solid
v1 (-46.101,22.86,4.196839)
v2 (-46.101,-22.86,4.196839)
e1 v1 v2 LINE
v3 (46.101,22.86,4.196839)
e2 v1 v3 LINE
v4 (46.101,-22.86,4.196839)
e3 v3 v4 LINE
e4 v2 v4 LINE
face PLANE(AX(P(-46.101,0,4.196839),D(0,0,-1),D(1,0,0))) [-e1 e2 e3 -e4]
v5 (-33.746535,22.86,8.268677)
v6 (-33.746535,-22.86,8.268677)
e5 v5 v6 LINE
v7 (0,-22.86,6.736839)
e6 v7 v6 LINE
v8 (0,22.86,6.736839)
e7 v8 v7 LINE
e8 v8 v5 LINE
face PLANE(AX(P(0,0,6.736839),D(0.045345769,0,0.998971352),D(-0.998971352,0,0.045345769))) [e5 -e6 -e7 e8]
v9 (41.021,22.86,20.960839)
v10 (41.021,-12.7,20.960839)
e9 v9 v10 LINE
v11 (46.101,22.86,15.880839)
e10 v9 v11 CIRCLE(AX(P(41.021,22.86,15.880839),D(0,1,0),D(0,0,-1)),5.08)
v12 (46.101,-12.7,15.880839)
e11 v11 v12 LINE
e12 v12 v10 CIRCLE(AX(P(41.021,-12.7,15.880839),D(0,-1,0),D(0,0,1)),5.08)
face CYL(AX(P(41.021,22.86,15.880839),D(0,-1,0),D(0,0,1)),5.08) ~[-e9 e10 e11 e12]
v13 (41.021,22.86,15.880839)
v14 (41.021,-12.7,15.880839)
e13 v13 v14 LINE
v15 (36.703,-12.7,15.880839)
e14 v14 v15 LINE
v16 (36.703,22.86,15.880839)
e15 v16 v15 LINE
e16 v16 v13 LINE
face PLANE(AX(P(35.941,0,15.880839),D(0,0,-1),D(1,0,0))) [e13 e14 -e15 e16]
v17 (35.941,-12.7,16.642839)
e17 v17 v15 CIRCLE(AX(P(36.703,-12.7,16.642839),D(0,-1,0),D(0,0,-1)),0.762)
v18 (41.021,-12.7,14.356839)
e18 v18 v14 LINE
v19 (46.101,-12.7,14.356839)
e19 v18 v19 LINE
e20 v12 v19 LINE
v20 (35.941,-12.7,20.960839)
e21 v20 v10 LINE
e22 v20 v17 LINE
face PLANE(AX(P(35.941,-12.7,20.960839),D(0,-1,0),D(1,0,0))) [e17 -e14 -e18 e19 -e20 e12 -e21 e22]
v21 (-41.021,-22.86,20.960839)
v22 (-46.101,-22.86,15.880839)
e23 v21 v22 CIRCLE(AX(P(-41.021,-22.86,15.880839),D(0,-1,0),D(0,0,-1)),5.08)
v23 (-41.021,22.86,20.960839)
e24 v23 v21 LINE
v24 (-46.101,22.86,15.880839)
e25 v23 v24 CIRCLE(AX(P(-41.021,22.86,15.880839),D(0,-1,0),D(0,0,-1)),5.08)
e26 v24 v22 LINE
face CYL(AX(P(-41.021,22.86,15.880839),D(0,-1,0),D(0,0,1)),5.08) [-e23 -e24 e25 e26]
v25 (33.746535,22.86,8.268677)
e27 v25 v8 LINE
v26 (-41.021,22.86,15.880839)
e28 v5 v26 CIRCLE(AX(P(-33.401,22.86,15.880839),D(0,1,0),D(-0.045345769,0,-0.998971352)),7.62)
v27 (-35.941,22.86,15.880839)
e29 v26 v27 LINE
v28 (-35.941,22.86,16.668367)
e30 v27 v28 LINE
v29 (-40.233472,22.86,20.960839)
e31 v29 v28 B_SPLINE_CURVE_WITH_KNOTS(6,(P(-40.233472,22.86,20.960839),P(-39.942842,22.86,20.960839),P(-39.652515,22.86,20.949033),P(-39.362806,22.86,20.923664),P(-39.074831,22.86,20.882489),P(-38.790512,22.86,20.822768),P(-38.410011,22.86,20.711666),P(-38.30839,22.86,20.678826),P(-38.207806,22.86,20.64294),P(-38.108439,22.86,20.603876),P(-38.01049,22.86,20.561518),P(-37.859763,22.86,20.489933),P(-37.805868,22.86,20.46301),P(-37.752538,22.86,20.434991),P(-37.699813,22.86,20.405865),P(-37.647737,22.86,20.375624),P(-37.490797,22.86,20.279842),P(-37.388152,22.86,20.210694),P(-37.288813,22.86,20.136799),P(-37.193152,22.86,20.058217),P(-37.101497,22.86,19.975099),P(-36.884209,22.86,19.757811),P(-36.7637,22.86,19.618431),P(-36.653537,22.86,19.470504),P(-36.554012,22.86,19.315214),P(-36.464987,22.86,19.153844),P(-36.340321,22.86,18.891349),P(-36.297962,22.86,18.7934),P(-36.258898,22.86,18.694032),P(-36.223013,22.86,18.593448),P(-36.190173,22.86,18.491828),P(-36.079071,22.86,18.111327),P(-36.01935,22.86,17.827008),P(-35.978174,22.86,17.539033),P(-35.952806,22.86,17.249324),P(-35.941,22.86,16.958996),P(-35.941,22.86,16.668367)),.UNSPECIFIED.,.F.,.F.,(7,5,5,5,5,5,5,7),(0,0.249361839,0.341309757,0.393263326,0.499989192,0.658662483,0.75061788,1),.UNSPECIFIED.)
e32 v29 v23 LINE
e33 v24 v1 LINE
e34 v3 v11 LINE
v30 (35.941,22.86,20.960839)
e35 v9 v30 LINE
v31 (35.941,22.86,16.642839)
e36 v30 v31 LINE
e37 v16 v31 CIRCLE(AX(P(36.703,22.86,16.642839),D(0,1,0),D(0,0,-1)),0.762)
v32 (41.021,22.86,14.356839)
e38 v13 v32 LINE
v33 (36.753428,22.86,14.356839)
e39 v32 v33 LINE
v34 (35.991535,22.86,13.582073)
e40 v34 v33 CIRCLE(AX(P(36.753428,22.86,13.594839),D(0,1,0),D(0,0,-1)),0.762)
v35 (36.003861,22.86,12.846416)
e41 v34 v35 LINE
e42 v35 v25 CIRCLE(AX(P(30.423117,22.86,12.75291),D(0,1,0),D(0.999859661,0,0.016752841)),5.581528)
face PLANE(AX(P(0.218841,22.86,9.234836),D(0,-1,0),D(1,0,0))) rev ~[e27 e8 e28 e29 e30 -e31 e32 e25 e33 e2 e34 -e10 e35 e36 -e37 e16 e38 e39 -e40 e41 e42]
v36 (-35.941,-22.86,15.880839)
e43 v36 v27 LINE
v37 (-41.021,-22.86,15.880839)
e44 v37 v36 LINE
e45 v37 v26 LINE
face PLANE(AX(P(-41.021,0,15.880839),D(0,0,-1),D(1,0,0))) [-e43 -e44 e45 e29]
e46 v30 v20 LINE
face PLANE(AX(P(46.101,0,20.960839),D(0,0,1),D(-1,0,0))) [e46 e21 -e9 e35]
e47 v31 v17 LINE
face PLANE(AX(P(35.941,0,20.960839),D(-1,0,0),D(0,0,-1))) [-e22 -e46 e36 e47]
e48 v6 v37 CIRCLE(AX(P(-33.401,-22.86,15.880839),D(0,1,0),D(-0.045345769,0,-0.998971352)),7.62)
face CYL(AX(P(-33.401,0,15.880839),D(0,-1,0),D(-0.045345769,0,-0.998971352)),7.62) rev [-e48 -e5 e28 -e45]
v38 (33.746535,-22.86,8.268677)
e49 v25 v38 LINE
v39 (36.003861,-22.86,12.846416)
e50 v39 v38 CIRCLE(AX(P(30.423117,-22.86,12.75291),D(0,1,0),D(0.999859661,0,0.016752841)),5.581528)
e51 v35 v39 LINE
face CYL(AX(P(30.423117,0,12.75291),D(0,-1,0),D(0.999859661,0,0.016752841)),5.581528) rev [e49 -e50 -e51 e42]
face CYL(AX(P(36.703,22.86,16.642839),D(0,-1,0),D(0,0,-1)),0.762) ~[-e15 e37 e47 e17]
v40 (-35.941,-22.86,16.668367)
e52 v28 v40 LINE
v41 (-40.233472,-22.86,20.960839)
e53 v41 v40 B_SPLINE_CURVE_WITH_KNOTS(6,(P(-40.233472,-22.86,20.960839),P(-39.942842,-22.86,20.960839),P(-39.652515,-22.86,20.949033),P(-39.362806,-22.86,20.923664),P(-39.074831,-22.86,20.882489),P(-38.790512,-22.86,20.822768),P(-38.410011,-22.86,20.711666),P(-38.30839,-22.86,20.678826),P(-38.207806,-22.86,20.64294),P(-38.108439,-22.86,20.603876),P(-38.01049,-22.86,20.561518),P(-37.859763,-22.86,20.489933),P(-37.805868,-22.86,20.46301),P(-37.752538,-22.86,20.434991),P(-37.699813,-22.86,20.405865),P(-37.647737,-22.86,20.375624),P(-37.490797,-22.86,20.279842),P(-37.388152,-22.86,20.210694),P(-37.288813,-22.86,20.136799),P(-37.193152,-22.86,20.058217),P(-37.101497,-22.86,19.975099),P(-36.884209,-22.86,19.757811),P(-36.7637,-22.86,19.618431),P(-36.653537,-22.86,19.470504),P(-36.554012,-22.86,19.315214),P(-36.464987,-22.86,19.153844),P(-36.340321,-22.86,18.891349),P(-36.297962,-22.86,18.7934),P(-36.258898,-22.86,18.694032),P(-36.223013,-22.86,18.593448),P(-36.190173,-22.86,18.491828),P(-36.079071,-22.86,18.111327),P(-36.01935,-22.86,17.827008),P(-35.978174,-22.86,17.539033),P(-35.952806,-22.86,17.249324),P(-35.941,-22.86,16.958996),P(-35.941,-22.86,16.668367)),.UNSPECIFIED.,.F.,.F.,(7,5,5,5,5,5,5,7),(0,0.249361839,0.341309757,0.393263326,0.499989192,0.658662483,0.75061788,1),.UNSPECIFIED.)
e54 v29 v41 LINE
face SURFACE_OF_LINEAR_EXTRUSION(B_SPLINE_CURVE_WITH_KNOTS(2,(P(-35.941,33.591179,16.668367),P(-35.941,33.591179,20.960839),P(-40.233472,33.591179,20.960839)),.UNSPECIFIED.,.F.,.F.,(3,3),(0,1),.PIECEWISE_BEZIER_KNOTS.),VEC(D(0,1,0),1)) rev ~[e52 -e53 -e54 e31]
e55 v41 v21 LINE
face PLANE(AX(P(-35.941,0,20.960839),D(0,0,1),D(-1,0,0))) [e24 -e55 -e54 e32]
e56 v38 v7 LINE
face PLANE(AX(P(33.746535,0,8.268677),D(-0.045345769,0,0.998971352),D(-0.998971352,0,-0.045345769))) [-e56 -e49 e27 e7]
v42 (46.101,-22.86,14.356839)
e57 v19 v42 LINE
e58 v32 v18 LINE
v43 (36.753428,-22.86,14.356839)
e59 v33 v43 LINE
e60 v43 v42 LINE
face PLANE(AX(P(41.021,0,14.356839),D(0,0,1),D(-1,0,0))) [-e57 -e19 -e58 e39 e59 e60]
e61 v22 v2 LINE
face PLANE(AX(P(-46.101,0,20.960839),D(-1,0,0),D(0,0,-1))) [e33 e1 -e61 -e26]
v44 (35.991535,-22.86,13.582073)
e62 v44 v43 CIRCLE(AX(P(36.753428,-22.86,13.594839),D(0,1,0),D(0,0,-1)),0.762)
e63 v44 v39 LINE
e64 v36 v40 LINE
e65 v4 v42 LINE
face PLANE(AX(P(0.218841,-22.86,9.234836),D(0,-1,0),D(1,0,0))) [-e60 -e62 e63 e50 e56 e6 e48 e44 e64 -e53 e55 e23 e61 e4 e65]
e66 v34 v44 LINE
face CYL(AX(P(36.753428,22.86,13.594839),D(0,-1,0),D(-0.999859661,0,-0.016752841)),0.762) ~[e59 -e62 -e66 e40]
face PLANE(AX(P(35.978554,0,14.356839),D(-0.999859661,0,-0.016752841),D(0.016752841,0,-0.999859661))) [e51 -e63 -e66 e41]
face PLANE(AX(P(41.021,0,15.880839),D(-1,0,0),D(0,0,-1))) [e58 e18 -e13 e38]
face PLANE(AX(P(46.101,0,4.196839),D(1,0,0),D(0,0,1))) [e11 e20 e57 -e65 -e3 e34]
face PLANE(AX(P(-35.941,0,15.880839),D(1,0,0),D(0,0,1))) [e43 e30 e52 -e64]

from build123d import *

# Parameters (mm, degrees)
F1_DEPTH    = 22.86
F2_R        = 5.08
F3_R        = 0.762
F4_R        = 0.762
F5_W        = 14.2031247761
F5_H        = 10.16
F6_DEPTH    = 6.604
F7_T1_DEPTH = 67.1823585695


# Not quite as in the source:
# - a fillet or chamfer that OpenCascade refuses, or shapes differently, is made with other operations: its cross-section is extruded or revolved along the edge and cut away or added


with BuildPart() as f1:
    # F0 (on Front) → F1 (new body, symmetric)
    with BuildSketch(Plane.XZ):
        with BuildLine():
            Line((-35.941, 20.9608385392), (-46.101, 20.9608385392))
            Line((-46.101, 20.9608385392), (-46.101, 4.1968385392))
            Line((-46.101, 4.1968385392), (0, 4.1968385392))
            Line((0, 4.1968385392), (46.101, 4.1968385392))
            Line((46.101, 4.1968385392), (46.101, 20.9608385392))
            Line((46.101, 20.9608385392), (35.941, 20.9608385392))
            Line((35.941, 20.9608385392), (35.941, 15.8808385392))
            Line((35.941, 15.8808385392), (41.021, 15.8808385392))
            Line((41.021, 15.8808385392), (41.021, 14.3568385392))
            Line((41.021, 14.3568385392), (35.9785540412, 14.3568385392))
            Line((35.9785540412, 14.3568385392), (36.0038614542, 12.846416393))
            ThreePointArc((36.0038614542, 12.846416393), (35.4291085131, 10.2844081543), (33.7465347616, 8.2686768405))
            Line((33.7465347616, 8.2686768405), (0, 6.7368385392))
            Line((0, 6.7368385392), (-33.7465347616, 8.2686768405))
            ThreePointArc((-33.7465347616, 8.2686768405), (-38.9099642803, 10.6162670887), (-41.021, 15.8808385392))
            Line((-41.021, 15.8808385392), (-35.941, 15.8808385392))
            Line((-35.941, 15.8808385392), (-35.941, 20.9608385392))
        make_face()
    extrude(amount=F1_DEPTH, both=True)

    # F2
    f2_edges = [f1.edges().sort_by_distance(p)[0] for p in [
        (-46.101, 0, 20.960839),
        (46.101, 0, 20.960839),
    ]]
    fillet(f2_edges, radius=F2_R)

    # F3
    f3_edges = [f1.edges().sort_by_distance(p)[0] for p in [
        (35.978554, 0, 14.356839),
    ]]
    fillet(f3_edges, radius=F3_R)

    # F4
    f4_edges = [f1.edges().sort_by_distance(p)[0] for p in [
        (35.941, 0, 15.880839),
    ]]
    fillet(f4_edges, radius=F4_R)

    # F5 (on face) → F6 (cut, through all)
    with BuildSketch(Plane.XY.offset(20.9608385392)):
        with Locations((43.0425623881, -17.78)):
            Rectangle(F5_W, F5_H)
    extrude(amount=-F6_DEPTH, mode=Mode.SUBTRACT)

    # F7: fillet of radius 4.2924717139 on 1 edges, made by hand

    # F7_s2 → F7_t1 (cut)
    with BuildSketch(Plane.XZ.offset(-33.5911792847)):
        with BuildLine():
            add(Edge.make_bspline(
                [(-35.941, 16.6683668253), (-35.941, 20.9608385392), (-40.2334717139, 20.9608385392)],
                knots=[0, 0, 0, 1, 1, 1], degree=2, weights=[1, 1, 1]))
            Line((-40.2334717139, 20.9608385392), (-35.941, 20.9608385392))
            Line((-35.941, 20.9608385392), (-35.941, 16.6683668253))
        make_face()
    extrude(amount=F7_T1_DEPTH, mode=Mode.SUBTRACT)


solid = f1.part
